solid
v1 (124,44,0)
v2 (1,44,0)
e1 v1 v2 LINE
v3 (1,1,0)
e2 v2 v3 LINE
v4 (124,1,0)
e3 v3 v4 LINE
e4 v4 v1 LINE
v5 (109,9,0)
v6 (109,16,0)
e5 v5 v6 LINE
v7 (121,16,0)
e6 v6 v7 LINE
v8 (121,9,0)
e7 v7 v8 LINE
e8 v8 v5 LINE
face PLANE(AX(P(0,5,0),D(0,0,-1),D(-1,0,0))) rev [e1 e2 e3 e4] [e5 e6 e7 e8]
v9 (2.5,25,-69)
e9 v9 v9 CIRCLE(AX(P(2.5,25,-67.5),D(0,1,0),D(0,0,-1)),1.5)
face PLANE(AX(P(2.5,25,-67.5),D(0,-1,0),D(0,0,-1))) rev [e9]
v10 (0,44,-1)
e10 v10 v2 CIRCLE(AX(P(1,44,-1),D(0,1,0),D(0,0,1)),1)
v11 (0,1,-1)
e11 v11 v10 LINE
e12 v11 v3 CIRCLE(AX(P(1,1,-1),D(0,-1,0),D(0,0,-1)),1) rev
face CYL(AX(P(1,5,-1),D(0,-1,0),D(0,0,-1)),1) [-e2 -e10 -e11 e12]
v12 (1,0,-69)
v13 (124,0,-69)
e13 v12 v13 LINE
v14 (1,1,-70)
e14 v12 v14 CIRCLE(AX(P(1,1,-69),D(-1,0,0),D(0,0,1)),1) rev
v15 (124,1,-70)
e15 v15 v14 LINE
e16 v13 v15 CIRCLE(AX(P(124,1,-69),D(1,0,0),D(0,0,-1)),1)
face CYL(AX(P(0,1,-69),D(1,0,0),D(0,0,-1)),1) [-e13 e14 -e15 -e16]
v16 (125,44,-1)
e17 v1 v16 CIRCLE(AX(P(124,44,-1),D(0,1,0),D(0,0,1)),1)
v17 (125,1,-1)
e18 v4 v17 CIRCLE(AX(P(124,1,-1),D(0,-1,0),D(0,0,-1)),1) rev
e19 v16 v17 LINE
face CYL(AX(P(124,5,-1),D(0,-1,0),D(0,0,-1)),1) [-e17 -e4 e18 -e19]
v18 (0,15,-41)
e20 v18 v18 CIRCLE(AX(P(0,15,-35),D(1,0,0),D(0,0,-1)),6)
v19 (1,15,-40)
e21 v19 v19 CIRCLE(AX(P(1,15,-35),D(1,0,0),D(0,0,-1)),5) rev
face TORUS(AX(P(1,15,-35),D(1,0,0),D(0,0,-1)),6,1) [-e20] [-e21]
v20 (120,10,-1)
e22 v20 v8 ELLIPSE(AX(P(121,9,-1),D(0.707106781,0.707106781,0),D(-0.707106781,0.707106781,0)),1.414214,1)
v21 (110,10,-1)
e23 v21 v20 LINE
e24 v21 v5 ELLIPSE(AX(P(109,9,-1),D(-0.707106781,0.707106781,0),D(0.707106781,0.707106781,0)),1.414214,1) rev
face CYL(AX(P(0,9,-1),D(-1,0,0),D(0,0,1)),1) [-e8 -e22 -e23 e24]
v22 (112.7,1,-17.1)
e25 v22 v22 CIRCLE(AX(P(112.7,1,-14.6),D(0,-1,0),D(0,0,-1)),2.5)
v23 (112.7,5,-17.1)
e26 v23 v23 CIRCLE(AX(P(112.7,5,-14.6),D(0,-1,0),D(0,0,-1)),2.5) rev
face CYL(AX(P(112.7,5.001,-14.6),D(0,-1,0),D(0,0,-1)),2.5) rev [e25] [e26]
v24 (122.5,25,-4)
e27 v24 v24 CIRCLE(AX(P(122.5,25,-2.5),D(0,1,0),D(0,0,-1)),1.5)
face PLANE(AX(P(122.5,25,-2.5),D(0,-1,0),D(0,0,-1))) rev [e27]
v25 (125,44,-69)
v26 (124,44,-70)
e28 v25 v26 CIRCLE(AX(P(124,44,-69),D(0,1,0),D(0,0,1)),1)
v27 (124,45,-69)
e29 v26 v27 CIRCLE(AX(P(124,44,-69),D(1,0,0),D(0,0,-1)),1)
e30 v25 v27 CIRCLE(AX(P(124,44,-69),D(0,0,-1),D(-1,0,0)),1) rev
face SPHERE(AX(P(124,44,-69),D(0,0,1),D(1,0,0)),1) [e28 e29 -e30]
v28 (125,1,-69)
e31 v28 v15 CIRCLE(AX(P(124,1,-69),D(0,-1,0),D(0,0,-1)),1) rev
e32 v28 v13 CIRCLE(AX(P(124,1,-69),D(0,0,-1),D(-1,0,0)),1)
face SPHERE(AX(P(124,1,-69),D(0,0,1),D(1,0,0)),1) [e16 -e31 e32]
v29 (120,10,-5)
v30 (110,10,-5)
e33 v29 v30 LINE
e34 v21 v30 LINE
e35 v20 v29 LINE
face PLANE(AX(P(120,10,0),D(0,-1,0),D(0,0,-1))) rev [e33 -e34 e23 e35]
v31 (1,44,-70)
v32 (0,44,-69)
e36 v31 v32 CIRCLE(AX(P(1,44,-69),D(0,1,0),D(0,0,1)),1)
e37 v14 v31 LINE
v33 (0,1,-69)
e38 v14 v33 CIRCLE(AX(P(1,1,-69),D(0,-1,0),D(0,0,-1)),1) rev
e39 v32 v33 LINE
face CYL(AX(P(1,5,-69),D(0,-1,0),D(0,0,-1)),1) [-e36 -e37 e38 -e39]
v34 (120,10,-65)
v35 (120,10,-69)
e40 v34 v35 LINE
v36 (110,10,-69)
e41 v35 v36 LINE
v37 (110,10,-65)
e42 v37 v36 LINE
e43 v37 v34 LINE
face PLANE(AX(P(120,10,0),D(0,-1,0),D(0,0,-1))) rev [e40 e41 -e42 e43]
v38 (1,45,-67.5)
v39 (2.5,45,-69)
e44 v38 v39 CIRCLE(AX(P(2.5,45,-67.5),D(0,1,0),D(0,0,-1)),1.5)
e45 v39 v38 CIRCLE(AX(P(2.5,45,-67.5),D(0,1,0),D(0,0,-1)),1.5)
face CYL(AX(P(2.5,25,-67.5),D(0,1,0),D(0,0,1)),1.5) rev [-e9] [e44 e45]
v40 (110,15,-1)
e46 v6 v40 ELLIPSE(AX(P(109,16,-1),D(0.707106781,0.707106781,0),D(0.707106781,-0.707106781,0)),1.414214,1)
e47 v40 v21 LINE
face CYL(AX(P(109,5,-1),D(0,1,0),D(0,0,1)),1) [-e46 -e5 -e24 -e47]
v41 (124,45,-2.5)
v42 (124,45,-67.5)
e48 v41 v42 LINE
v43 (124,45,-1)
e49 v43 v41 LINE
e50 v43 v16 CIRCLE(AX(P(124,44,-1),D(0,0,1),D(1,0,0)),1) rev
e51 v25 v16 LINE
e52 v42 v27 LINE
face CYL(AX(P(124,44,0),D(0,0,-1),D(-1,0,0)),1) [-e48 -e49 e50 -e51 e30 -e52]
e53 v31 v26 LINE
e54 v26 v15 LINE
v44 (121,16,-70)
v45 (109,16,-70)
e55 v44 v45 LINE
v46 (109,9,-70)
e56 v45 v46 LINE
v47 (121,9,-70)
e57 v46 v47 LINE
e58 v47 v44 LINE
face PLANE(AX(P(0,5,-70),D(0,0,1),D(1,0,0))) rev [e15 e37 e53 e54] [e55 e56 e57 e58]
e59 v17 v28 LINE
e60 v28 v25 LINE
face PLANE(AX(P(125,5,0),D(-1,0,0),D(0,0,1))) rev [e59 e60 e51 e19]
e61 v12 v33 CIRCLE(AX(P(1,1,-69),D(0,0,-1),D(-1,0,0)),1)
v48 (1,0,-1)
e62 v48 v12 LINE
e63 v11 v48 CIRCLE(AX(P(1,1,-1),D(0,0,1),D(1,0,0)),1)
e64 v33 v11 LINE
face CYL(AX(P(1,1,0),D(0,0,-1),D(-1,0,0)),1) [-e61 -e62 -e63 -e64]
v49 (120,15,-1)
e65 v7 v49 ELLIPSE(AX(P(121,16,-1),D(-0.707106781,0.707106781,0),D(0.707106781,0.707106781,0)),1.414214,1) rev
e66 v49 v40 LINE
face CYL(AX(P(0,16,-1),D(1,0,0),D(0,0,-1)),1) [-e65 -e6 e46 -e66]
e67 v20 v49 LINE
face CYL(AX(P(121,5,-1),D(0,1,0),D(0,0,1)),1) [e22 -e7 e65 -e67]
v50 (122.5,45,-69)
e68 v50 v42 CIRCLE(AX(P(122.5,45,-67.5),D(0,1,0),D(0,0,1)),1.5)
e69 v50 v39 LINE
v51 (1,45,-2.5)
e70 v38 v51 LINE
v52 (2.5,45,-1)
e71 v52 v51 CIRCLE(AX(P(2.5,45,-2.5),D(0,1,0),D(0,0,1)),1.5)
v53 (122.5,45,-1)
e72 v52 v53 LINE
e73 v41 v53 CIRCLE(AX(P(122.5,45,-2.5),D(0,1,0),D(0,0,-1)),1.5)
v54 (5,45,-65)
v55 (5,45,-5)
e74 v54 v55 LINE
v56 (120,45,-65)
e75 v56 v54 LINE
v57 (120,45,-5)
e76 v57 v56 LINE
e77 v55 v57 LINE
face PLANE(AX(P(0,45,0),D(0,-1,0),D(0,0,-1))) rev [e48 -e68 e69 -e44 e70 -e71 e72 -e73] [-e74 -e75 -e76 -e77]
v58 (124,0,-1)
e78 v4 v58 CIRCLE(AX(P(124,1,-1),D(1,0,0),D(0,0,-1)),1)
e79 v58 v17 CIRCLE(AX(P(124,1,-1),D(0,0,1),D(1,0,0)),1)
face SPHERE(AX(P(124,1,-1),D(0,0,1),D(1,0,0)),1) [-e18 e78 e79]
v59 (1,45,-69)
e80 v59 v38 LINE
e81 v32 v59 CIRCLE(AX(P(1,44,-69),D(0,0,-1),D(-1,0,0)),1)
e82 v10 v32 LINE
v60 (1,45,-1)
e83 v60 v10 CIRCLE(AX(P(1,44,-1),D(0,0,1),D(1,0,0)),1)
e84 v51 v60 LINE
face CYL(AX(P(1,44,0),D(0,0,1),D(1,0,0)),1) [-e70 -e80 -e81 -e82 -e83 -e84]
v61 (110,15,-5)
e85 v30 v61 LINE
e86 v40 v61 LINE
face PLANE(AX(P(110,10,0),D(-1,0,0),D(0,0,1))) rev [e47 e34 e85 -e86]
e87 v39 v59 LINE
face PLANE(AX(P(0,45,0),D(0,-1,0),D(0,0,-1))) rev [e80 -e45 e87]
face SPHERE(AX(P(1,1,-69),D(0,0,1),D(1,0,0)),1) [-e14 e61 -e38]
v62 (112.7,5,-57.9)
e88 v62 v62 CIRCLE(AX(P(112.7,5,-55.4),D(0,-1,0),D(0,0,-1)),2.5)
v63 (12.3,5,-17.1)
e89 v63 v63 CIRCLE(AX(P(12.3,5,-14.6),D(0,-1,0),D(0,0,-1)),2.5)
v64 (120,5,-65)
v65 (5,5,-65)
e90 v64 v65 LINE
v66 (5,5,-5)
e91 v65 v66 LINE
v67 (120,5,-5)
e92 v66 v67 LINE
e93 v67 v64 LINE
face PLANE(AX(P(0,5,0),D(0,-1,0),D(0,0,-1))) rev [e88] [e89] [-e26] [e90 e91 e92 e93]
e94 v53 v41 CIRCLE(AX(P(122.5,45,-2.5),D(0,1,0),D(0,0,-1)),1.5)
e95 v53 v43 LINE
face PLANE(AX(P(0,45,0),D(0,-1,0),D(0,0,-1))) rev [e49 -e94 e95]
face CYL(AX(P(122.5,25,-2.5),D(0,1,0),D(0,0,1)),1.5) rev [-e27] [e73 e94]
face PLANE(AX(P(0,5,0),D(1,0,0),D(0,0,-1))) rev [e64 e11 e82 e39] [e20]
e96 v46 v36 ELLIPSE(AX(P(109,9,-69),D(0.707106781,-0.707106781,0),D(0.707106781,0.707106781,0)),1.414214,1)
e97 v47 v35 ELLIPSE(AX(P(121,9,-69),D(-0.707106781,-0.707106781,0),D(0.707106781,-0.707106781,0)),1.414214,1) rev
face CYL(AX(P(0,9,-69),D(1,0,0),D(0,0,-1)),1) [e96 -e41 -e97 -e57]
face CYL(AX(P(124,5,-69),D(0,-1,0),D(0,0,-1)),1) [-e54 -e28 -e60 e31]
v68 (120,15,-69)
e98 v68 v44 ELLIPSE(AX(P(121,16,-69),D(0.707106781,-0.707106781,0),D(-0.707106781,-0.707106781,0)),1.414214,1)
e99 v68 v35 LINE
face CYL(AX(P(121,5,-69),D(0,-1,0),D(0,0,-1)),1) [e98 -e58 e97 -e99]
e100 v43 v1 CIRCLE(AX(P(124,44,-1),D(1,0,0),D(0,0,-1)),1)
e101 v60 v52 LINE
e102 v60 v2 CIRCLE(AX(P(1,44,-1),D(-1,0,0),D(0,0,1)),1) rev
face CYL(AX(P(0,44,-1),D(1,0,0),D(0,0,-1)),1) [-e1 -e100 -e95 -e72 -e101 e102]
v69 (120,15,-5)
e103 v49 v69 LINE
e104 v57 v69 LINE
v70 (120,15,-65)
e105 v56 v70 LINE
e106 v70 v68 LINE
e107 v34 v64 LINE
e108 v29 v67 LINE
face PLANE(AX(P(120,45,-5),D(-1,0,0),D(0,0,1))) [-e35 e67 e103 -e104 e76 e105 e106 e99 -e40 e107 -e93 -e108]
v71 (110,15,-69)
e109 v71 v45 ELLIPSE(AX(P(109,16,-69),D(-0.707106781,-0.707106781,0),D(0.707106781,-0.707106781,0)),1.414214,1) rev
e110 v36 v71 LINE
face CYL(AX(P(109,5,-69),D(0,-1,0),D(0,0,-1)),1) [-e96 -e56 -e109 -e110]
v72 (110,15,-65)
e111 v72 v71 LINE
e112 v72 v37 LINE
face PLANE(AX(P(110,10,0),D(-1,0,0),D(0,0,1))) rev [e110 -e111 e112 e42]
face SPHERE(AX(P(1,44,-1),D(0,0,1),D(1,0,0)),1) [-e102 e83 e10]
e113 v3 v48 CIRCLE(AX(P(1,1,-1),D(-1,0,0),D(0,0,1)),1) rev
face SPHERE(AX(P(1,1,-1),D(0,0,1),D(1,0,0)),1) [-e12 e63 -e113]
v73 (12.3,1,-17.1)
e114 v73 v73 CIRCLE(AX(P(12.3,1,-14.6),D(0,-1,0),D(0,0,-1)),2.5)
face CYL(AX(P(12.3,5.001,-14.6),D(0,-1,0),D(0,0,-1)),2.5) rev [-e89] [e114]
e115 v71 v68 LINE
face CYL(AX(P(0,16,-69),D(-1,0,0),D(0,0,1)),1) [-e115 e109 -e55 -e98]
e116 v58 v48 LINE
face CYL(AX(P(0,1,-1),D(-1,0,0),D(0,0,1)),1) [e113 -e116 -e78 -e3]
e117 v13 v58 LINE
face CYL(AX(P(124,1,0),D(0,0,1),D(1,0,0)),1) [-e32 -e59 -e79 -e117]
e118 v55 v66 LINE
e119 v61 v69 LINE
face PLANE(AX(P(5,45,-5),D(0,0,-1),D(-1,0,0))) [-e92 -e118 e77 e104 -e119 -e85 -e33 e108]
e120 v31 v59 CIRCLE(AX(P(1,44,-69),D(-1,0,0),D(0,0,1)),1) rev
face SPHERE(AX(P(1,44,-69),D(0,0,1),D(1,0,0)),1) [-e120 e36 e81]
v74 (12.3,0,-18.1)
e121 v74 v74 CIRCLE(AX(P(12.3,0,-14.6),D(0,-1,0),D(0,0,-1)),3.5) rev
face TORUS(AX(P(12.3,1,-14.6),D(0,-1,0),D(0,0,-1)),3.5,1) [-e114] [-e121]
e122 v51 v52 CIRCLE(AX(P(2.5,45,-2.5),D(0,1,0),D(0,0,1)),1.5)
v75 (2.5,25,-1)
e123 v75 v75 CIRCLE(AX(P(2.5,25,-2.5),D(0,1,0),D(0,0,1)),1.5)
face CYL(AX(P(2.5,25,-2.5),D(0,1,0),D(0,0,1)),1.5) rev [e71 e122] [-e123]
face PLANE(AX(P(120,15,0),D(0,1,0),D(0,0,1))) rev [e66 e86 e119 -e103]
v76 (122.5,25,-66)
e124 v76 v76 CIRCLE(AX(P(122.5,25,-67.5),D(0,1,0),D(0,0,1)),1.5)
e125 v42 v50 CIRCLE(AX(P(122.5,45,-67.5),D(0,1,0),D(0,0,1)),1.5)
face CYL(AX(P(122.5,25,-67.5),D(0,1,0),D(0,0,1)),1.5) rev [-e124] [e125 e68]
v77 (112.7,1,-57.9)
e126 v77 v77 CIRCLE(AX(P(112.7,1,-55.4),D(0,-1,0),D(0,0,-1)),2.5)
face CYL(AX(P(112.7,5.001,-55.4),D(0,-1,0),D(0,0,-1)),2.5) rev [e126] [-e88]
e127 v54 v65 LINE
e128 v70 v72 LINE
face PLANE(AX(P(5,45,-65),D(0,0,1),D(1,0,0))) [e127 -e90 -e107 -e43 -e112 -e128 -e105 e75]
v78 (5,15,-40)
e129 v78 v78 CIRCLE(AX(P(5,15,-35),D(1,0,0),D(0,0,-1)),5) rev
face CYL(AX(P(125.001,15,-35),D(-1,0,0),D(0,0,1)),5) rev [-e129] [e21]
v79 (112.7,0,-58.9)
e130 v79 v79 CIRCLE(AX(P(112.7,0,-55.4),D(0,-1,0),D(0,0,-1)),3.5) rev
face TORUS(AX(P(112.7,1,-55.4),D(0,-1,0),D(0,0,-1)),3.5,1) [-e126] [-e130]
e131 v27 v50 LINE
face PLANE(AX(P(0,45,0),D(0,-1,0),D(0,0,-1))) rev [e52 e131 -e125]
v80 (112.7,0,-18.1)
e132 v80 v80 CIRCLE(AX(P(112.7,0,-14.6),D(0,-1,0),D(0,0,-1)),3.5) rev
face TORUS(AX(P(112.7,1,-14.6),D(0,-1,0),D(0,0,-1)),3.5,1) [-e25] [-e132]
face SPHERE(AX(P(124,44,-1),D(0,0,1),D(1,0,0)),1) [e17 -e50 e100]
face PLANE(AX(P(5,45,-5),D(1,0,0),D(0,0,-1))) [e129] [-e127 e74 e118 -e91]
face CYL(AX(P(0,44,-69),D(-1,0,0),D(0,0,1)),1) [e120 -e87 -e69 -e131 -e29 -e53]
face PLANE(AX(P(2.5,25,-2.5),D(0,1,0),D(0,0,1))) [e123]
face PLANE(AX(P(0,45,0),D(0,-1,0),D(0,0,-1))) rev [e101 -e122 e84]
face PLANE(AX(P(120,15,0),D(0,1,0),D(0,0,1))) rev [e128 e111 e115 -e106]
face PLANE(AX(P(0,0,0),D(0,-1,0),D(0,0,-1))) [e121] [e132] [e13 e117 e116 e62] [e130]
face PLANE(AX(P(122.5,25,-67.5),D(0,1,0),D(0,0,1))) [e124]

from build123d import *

# Parameters (mm, degrees)
SKETCH1_W               = 125
SKETCH1_H               = 70
BOSS_EXTRUDE1_DEPTH     = 5
CUT_EXTRUDE1_REACH      = 145.353
SKETCH2_R               = 2.5
SKETCH3_W               = 125
SKETCH3_H               = 70
SKETCH3_W_2             = 115
SKETCH3_H_2             = 60
BOSS_EXTRUDE2_DEPTH     = 40
CUT_EXTRUDE2_REACH      = 152.167
SKETCH4_R               = 5
CUT_EXTRUDE3_DEPTH      = 151.166574177
CUT_EXTRUDE3_DEPTH_BACK = 151.166574177
SKETCH6_W               = 10
SKETCH6_H               = 5
SKETCH7_R               = 1.5
CUT_EXTRUDE4_DEPTH      = 20
FILLET2_R               = 1


with BuildPart() as part:
    # Sketch1 → Boss-Extrude1 (new body)
    with BuildSketch(Plane(origin=(0, 0, 0), x_dir=(1, 0, 0), z_dir=(0, 1, 0))):
        with Locations((62.5, 35)):
            Rectangle(SKETCH1_W, SKETCH1_H)
    extrude(amount=BOSS_EXTRUDE1_DEPTH)

    # Sketch2 → Cut-Extrude1 (cut, up to next)
    with BuildSketch(Plane.XZ, mode=Mode.PRIVATE) as cut_extrude1_sk1:
        with Locations(Location((112.7, -14.6, 0), (0, 0, 270))):
            Circle(SKETCH2_R)
    cut_extrude1_tool1 = extrude(cut_extrude1_sk1.sketch, amount=-CUT_EXTRUDE1_REACH, mode=Mode.PRIVATE) & part.part
    # Sketch2 → Cut-Extrude1 (cut, up to next)
    with BuildSketch(Plane.XZ, mode=Mode.PRIVATE) as cut_extrude1_sk2:
        with Locations(Location((112.7, -55.4, 0), (0, 0, 270))):
            Circle(SKETCH2_R)
    cut_extrude1_tool2 = extrude(cut_extrude1_sk2.sketch, amount=-CUT_EXTRUDE1_REACH, mode=Mode.PRIVATE) & part.part
    # Sketch2 → Cut-Extrude1 (cut, up to next)
    with BuildSketch(Plane.XZ, mode=Mode.PRIVATE) as cut_extrude1_sk3:
        with Locations(Location((12.3, -14.6, 0), (0, 0, 270))):
            Circle(SKETCH2_R)
    cut_extrude1_tool3 = extrude(cut_extrude1_sk3.sketch, amount=-CUT_EXTRUDE1_REACH, mode=Mode.PRIVATE) & part.part
    add(cut_extrude1_tool1.solids().sort_by_distance((112.7, 0, -14.6))[0], mode=Mode.SUBTRACT)
    add(cut_extrude1_tool2.solids().sort_by_distance((112.7, 0, -55.4))[0], mode=Mode.SUBTRACT)
    add(cut_extrude1_tool3.solids().sort_by_distance((12.3, 0, -14.6))[0], mode=Mode.SUBTRACT)

    # Sketch3 → Boss-Extrude2 (add)
    with BuildSketch(Plane(origin=(0, 5, 0), x_dir=(1, 0, 0), z_dir=(0, 1, 0))):
        with Locations((62.5, 35)):
            Rectangle(SKETCH3_W, SKETCH3_H)
        with Locations((62.5, 35)):
            Rectangle(SKETCH3_W_2, SKETCH3_H_2, mode=Mode.SUBTRACT)
    extrude(amount=BOSS_EXTRUDE2_DEPTH)

    # Sketch4 → Cut-Extrude2 (cut, up to next)
    with BuildSketch(Plane.ZY, mode=Mode.PRIVATE) as cut_extrude2_sk1:
        with Locations((-35, 15)):
            Circle(SKETCH4_R)
    cut_extrude2_tool1 = extrude(cut_extrude2_sk1.sketch, amount=-CUT_EXTRUDE2_REACH, mode=Mode.PRIVATE) & part.part
    add(cut_extrude2_tool1.solids().sort_by_distance((0, 15, -35))[0], mode=Mode.SUBTRACT)

    # Sketch6 → Cut-Extrude3 (cut, two sides: drawn at the far end of the back side and taken through both)
    with BuildSketch(Plane(origin=(0, 0, -70), x_dir=(-1, 0, 0), z_dir=(0, 0, -1)).offset(-CUT_EXTRUDE3_DEPTH_BACK)):
        with Locations((-115, 12.5)):
            Rectangle(SKETCH6_W, SKETCH6_H)
    extrude(amount=CUT_EXTRUDE3_DEPTH + CUT_EXTRUDE3_DEPTH_BACK, mode=Mode.SUBTRACT)

    # Sketch7 → Cut-Extrude4 (cut)
    with BuildSketch(Plane(origin=(0, 45, 0), x_dir=(1, 0, 0), z_dir=(0, 1, 0))):
        with Locations(Location((2.5, 2.5, 0), (0, 0, 270))):
            Circle(SKETCH7_R)
        with Locations(Location((2.5, 67.5, 0), (0, 0, 90))):
            Circle(SKETCH7_R)
        with Locations(Location((122.5, 67.5, 0), (0, 0, 270))):
            Circle(SKETCH7_R)
        with Locations(Location((122.5, 2.5, 0), (0, 0, 90))):
            Circle(SKETCH7_R)
    extrude(amount=-CUT_EXTRUDE4_DEPTH, mode=Mode.SUBTRACT)

    # Fillet2
    fillet2_edges = [part.edges().sort_by_distance(p)[0] for p in [
        (12.3, 0, -12.1),
        (112.7, 0, -52.9),
        (112.7, 0, -12.1),
        (0, 45, -35),
        (62.5, 45, 0),
        (125, 45, -35),
        (62.5, 45, -70),
        (62.5, 0, -70),
        (125, 0, -35),
        (0, 15, -40),
        (62.5, 0, 0),
        (0, 0, -35),
        (110, 12.5, -70),
        (115, 10, -70),
        (120, 12.5, -70),
        (115, 15, -70),
        (110, 12.5, 0),
        (115, 10, 0),
        (120, 12.5, 0),
        (115, 15, 0),
        (0, 22.5, -70),
        (125, 22.5, -70),
        (125, 22.5, 0),
        (0, 22.5, 0),
    ]]
    fillet(fillet2_edges, radius=FILLET2_R - 0.0001)  # a hair under: the kernel refuses the full size


solid = part.part
